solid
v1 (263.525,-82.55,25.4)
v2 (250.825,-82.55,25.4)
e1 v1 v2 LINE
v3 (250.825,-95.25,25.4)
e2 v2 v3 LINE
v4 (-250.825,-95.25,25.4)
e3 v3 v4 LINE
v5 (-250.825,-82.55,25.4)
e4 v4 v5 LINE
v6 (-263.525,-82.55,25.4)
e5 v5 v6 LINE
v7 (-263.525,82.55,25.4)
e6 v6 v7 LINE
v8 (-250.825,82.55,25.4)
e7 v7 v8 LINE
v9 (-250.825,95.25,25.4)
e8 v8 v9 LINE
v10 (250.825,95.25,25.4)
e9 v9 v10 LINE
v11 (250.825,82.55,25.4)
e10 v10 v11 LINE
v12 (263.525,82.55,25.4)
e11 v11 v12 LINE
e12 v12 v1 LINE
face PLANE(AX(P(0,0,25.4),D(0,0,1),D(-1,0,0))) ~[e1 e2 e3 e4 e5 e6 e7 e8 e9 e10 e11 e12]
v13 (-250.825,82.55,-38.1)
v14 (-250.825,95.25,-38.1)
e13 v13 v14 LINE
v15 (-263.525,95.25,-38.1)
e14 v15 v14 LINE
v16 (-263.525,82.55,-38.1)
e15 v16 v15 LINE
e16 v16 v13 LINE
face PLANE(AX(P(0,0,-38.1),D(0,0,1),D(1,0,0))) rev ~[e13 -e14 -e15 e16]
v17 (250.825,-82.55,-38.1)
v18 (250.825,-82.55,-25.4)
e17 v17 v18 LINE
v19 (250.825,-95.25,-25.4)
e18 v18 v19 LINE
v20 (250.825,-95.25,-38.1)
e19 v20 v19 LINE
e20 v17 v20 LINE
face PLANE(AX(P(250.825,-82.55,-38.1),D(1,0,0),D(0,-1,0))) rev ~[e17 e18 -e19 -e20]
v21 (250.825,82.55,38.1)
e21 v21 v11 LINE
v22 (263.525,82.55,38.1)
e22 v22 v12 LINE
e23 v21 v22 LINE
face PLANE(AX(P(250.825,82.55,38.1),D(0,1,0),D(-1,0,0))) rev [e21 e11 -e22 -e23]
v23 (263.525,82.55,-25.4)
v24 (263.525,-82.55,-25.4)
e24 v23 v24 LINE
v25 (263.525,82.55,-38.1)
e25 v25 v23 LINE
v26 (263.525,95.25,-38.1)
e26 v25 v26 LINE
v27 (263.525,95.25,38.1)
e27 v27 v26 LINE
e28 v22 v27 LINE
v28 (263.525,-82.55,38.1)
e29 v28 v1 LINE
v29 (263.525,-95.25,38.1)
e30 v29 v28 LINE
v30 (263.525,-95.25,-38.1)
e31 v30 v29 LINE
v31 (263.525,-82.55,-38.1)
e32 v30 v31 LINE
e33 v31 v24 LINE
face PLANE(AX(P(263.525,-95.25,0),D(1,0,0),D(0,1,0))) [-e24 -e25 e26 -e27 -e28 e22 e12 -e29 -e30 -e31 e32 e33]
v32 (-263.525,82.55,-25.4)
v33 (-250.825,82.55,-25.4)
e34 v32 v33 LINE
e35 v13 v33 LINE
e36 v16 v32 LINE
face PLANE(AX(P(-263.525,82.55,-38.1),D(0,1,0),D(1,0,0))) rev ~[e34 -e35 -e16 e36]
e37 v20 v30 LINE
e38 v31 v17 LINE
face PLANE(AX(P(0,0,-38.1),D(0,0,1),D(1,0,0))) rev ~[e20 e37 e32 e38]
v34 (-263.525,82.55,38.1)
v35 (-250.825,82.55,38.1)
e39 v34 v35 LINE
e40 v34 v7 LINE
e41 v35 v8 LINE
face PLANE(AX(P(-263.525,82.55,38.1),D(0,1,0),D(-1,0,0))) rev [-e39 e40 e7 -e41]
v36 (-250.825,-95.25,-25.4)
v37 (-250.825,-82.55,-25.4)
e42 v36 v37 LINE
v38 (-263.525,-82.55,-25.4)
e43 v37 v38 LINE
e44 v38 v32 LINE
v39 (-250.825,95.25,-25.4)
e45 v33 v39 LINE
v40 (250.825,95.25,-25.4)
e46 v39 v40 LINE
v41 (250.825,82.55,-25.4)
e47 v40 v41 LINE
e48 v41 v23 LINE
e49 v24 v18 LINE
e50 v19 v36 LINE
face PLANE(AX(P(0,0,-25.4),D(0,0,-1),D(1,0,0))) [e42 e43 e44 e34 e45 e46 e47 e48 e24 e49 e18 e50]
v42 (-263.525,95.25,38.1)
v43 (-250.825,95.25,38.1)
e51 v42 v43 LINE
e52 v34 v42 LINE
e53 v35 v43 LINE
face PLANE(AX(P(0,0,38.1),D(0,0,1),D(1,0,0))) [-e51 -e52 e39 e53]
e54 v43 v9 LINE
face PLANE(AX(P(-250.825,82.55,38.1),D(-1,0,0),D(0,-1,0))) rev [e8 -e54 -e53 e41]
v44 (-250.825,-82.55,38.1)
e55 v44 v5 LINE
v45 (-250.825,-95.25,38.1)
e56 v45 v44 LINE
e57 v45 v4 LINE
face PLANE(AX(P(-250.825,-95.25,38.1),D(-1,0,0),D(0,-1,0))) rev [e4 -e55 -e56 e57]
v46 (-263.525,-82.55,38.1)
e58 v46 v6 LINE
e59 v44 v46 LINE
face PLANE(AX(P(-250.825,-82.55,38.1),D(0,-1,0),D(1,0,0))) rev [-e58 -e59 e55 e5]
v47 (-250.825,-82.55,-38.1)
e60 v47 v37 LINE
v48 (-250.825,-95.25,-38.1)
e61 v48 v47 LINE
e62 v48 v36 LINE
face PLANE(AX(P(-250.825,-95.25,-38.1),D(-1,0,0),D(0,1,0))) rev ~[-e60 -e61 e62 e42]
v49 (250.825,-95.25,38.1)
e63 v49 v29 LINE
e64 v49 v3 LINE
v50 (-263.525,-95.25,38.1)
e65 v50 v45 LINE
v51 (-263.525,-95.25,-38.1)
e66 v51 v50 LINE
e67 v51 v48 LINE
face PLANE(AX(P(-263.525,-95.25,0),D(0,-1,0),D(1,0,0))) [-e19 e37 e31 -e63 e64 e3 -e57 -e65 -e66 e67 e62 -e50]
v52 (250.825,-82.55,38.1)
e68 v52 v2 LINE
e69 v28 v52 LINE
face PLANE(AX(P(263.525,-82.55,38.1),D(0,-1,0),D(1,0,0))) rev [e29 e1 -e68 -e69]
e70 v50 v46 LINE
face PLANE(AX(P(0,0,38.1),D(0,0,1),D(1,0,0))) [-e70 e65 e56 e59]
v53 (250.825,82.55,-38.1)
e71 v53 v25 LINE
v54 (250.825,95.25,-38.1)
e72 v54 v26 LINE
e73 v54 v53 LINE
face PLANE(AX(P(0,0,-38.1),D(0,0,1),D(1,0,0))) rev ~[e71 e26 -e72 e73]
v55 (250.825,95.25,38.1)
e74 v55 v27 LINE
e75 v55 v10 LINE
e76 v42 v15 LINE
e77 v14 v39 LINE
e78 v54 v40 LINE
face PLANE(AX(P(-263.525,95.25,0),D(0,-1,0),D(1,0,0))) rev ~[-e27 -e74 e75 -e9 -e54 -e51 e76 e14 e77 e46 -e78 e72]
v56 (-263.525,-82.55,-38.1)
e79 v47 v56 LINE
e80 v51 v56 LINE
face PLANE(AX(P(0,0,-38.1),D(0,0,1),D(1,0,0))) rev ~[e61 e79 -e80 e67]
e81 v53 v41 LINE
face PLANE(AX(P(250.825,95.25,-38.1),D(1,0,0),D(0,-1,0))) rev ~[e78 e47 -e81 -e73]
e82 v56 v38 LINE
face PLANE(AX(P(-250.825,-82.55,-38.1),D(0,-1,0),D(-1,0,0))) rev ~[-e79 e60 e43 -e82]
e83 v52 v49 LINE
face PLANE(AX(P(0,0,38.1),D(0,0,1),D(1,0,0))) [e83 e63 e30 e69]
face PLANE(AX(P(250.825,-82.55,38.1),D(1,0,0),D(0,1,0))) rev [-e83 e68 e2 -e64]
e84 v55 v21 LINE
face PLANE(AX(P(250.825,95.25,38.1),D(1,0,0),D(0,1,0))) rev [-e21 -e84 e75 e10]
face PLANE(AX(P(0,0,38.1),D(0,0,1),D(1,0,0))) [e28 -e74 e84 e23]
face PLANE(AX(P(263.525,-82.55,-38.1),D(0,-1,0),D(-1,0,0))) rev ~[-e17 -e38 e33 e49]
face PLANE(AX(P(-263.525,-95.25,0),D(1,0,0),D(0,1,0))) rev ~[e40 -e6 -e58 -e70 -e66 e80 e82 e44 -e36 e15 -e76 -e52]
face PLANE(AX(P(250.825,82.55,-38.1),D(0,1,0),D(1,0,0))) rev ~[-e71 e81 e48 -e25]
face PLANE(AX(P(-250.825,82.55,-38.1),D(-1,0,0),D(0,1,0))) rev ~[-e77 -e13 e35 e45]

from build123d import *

# Parameters (mm, degrees)
F0_W     = 527.05
F0_H     = 190.5
F1_DEPTH = 38.1
F3_DEPTH = 12.7


# Not quite as in the source:
# - a pattern or mirror of a feature is missing from the dataset's text; its kind, count and spacing are read off the source's solid


with BuildPart() as f1:
    # F0 (on Top) → F1 (new body, symmetric)
    with BuildSketch(Plane.XY):
        Rectangle(F0_W, F0_H)
    extrude(amount=F1_DEPTH, both=True)

    # F2 (on face) → F3 (cut)
    with BuildSketch(Plane(origin=(0, 0, -38.1), x_dir=(1, 0, 0), z_dir=(0, 0, -1))):
        Polygon((250.825, 95.25), (-250.825, 95.25), (-250.825, 82.55), (-263.525, 82.55), (-263.525, -82.55), (-250.825, -82.55), (-250.825, -95.25), (250.825, -95.25), (250.825, -82.55), (263.525, -82.55), (263.525, 82.55), (250.825, 82.55), align=None)
    f3 = extrude(amount=-F3_DEPTH, mode=Mode.SUBTRACT)

    # F3_copies: F3 across plane
    add(f3.mirror(Plane.XY), mode=Mode.SUBTRACT)


solid = f1.part
